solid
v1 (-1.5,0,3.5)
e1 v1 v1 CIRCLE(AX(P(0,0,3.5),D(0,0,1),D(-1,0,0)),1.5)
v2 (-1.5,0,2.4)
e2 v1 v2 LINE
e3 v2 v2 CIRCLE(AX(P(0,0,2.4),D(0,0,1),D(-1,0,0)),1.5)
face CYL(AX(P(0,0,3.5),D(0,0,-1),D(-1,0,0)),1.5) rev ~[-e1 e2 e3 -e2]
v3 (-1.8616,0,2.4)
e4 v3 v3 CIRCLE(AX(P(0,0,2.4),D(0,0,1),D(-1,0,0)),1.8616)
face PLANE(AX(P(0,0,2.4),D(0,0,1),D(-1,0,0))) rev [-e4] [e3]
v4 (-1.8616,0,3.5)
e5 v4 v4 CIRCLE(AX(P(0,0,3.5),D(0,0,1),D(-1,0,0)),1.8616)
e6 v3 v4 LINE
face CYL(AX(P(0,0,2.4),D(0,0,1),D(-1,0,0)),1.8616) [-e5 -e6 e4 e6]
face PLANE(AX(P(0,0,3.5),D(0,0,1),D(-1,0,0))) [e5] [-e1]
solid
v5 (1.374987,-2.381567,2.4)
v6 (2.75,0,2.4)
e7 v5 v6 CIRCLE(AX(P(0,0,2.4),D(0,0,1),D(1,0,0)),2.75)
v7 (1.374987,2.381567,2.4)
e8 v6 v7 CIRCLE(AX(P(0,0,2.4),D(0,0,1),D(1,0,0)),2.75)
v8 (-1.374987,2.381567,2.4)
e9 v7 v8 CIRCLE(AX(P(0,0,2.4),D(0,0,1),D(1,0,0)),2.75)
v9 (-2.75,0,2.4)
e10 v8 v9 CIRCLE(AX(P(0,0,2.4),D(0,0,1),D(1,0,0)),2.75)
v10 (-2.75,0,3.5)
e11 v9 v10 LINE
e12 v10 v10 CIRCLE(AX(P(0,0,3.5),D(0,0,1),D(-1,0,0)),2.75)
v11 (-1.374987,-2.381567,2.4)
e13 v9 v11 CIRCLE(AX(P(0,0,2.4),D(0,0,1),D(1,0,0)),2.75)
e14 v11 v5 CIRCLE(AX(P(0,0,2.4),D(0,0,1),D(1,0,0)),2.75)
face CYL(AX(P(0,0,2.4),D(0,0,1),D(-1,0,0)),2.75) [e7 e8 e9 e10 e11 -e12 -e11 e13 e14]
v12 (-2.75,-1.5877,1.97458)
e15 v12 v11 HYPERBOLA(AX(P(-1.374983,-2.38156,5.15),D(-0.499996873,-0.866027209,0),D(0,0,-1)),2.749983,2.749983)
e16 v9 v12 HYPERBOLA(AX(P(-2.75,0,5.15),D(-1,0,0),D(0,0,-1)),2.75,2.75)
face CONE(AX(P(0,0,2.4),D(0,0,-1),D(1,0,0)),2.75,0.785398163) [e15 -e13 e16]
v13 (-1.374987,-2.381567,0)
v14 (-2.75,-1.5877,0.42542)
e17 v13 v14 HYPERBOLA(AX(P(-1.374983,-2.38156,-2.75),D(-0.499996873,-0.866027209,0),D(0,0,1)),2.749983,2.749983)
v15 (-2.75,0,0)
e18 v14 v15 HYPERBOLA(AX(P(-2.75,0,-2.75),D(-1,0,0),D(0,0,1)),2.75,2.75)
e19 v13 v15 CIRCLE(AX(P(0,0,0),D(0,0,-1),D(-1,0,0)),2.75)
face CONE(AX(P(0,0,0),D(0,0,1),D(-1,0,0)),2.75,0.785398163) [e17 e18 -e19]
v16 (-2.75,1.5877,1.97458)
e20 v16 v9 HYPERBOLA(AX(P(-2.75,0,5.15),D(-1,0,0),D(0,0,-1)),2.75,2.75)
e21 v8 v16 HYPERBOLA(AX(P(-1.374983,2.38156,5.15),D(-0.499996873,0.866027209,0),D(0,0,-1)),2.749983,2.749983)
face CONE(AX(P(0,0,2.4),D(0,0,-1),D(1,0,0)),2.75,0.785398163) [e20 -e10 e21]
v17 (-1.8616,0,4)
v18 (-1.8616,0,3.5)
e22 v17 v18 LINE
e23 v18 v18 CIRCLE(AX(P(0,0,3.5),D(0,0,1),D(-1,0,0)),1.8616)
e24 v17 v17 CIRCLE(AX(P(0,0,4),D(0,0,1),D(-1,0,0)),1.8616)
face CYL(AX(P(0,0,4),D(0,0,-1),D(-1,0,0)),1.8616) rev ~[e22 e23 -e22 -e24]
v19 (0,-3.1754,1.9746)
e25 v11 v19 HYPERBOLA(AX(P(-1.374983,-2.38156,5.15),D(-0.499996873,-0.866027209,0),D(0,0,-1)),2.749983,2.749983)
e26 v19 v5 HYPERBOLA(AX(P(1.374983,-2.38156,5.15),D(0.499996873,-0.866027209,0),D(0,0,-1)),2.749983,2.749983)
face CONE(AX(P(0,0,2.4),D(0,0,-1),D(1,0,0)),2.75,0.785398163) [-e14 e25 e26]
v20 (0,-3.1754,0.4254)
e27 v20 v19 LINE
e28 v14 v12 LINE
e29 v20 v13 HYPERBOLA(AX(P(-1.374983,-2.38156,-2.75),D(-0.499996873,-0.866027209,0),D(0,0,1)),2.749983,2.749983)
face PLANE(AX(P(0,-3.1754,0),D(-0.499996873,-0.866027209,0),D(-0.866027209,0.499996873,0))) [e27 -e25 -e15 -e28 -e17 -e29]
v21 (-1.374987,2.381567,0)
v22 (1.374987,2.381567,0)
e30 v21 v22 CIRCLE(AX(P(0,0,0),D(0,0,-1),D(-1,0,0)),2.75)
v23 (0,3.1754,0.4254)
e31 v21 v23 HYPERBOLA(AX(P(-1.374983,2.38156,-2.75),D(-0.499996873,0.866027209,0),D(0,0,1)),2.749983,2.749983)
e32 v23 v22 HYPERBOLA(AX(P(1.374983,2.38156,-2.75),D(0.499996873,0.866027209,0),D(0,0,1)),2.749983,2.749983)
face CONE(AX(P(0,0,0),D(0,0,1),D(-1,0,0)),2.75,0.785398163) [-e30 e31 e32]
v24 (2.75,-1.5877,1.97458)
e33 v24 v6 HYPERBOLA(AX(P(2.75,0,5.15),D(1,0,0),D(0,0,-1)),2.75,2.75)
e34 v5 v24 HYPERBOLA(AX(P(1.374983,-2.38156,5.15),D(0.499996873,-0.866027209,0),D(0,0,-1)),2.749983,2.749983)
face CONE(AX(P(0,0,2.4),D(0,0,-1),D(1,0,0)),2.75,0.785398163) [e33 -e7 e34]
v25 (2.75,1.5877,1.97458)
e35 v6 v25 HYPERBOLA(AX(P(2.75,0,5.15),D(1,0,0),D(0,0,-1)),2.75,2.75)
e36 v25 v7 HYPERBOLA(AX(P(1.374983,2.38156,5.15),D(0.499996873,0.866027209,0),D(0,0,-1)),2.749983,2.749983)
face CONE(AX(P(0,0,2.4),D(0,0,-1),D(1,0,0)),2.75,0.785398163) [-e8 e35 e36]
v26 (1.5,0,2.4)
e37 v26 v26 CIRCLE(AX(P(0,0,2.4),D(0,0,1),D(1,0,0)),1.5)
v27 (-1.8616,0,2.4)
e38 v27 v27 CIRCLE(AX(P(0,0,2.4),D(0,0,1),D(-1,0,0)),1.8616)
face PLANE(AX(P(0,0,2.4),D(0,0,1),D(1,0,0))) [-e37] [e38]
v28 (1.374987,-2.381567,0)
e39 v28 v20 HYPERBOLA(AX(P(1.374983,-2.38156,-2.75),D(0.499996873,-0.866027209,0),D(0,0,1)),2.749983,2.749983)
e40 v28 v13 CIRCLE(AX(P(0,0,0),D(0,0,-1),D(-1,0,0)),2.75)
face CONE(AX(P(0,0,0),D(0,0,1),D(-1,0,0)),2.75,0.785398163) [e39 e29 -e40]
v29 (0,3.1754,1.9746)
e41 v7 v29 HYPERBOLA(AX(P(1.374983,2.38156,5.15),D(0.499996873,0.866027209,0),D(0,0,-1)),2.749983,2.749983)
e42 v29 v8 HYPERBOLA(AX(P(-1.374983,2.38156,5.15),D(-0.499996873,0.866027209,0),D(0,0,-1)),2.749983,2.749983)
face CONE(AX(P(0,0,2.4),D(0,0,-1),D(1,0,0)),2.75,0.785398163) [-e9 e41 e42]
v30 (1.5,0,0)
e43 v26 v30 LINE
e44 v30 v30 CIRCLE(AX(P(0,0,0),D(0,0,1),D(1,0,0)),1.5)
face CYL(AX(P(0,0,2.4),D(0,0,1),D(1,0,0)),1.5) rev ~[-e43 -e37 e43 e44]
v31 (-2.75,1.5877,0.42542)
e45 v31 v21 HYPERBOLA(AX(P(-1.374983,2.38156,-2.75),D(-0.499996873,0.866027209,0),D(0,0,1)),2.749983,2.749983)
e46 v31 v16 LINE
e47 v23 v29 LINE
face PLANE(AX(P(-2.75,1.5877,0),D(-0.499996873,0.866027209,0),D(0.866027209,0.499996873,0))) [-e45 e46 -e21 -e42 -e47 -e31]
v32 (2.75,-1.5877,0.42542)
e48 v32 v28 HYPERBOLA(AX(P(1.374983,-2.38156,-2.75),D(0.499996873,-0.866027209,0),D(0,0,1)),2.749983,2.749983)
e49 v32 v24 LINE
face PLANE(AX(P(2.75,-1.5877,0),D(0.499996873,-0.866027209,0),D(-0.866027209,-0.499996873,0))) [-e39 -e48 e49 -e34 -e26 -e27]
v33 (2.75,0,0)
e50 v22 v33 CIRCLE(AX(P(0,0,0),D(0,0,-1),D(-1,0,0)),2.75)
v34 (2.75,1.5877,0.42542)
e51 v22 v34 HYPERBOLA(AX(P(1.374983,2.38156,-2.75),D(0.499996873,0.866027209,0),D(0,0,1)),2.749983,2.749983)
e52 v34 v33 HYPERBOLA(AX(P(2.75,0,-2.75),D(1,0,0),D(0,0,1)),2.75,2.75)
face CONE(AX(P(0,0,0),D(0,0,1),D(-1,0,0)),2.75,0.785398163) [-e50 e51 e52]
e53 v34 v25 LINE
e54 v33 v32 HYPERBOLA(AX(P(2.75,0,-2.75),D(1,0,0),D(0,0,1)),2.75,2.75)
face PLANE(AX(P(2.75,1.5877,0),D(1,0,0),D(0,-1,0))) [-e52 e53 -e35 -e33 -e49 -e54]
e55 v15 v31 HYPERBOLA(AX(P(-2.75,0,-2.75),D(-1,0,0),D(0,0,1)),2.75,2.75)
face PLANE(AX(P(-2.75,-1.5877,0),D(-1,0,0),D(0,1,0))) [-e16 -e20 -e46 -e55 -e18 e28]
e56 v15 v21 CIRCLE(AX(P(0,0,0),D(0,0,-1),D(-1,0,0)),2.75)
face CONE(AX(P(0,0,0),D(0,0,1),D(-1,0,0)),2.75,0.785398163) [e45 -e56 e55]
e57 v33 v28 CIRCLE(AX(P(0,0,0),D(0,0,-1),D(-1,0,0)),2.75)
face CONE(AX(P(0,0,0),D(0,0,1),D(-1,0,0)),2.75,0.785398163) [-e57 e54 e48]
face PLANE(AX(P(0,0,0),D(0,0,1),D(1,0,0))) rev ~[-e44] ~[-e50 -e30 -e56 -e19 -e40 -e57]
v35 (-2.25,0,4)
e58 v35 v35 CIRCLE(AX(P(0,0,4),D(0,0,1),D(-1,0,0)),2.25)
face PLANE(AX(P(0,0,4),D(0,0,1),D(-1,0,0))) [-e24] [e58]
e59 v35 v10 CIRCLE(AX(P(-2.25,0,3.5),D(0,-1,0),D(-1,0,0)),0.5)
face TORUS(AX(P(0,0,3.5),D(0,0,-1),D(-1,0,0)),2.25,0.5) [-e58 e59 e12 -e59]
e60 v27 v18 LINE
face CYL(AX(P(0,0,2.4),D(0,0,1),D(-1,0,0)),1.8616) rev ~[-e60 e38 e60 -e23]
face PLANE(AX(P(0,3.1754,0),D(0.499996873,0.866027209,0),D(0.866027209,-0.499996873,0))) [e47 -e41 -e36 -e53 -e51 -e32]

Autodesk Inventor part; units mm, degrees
ref_plane "YZ Plane" through (0, 0, 0) normal (1, 0, 0) x (0, 1, 0)
ref_plane "XZ Plane" through (0, 0, 0) normal (0, 1, 0) x (-1, 0, 0)
ref_plane "XY Plane" through (0, 0, 0) normal (0, 0, 1) x (1, 0, 0)
sketch "Sketch1" plane through (0, 0, 0) normal (0, 0, 1) x (1, 0, 0)
  line L0 (0, 3.1754) -> (2.75, 1.5877)
  line L1 (2.75, 1.5877) -> (2.75, -1.5877)
  line L2 (2.75, -1.5877) -> (0, -3.1754)
  line L3 (0, -3.1754) -> (-2.75, -1.5877)
  line L4 (-2.75, -1.5877) -> (-2.75, 1.5877)
  line L5 (-2.75, 1.5877) -> (0, 3.1754)
  point P0 (0, 0)
  point P1 (0, 0)
  dimension "d0" = 5.5
extrude "Main Body" add sketch "Sketch1" along normal blind 2.4
sketch "Sketch2" plane through (0, 0, 2.4) normal (0, 0, 1) x (1, 0, 0)
  circle A0 centre (0, 0) radius 2.75
  line L0 (2.75, -1.5877) -> (2.75, 1.5877) construction
  point P0 (2.75, 0)
extrude "Front Taper" cut sketch "Sketch2" against normal up to surface (2.4 mm away) draft 45 keep common part
sketch "Sketch3" plane through (0, 0, 0) normal (0, 0, -1) x (-1, 0, 0)
  circle A0 centre (0, 0) radius 2.75
  line L0 (-2.75, -1.5877) -> (-2.75, 1.5877) projected
  point P0 (-2.75, 0)
extrude "Back Taper" cut sketch "Sketch3" against normal up to surface (2.4 mm away) draft 45 keep common part
sketch "Sketch4" plane through (0, 0, 2.4) normal (0, 0, 1) x (1, 0, 0)
  circle A0 centre (0, 0) radius 1.5
  dimension "d9" = 3
extrude "Center Hole" cut sketch "Sketch4" against normal up to surface (2.4 mm away)
sketch "Sketch6" plane through (0, 0, 0) normal (0, 1, 0) x (-1, 0, 0)
  line L0 (-2.75, 0) -> (-2.75, 2.4) projected
  line L1 (-2.75, 2.4) -> (-1.5, 2.4) projected
  line L2 (-1.5, 0) -> (-2.75, 0) projected
  line L3 (2.75, 2.4) -> (2.75, 0) projected
  line L4 (2.75, 0) -> (1.5, 0) projected
  line L5 (1.5, 2.4) -> (2.75, 2.4) projected
  line L6 (1.5, 2.4) -> (1.8616, 2.4)
  line L7 (1.8616, 2.4) -> (1.8616, 3.5)
  line L8 (1.8616, 3.5) -> (1.5, 3.5)
  line L9 (1.5, 3.5) -> (1.5, 2.4)
  line L10 (1.8616, 2.4) -> (2.75, 2.4)
  line L11 (2.75, 2.4) -> (2.75, 4)
  line L12 (2.75, 4) -> (1.8616, 4)
  line L13 (1.8616, 4) -> (1.8616, 2.4)
  line L14 (0, -1.0258) -> (0, 4.8376) projected
  line L15 (-1.5, 2.4) -> (-1.5, 0) projected
  line L16 (1.5, 0) -> (1.5, 2.4) projected
  point P0 (0, 0)
  dimension "d35" = 0.3616
  dimension "d36" = 1.6
  dimension "d37" = 0.5
revolve "Locking Cap" add sketch "Sketch6" angle 360 about axis through (0, 0, -10) along (0, 0, 1) contours L5 L7 L13 L12 L11
fillet "Fillet1" radius 0.5 1 edges at (2.75, 0, 4)
revolve "Nylon Locking" add sketch "Sketch6" angle 360 about axis through (0, 0, -10) along (0, 0, 1) separate body contours L5 L9 L8 L7
thread "Thread1" size "M3x0.5" class "6H" standard "ANSI Metric M Profile" full length
sketch "Sketch5" plane through (0, 0, 0) normal (1, 0, 0) x (0, 1, 0)
  line L0 (-1.8259, 3.2833) -> (-1.5, 3.4714)
  line L1 (-1.5, 3.4714) -> (-1.5, 2.9714)
  line L2 (-1.5, 2.9714) -> (-1.8259, 3.1596)
  line L3 (-1.933, 3.2214) -> (-1.5, 3.2214) construction
  line L4 (-1.5, 2.4) -> (1.5, 2.4) construction
  arc A0 (-1.8259, 3.2833) -> (-1.8259, 3.1596) centre (-1.7902, 3.2214) ccw
  point P0 (0, 0)
  point P1 (-1.6443, 3.2214)
  point P2 (-1.8616, 3.2214)
  dimension "d14" = 0.5
  dimension "d15" = 0.5714
  dimension "d16" = 0
  dimension "d17" = 0.0714
  dimension "d33" = 0.3616
coil "Coil1" [suppressed]
equation "\"d0\" = size"
equation "\"d1\" = sideHeight"
equation "\"d9\" = nominalDiameter"
equation "\"d35\" = d33"
equation "\"d36\" = lockingHeight"
equation "\"d37\" = threadPitch"
equation "\"d40\" = d37"
equation "\"d14\" = threadPitch"
equation "\"d15\" = 1.14286 * threadPitch"
equation "\"d17\" = 0.142857 * threadPitch"
equation "\"d18\" = threadPitch"
equation "\"d19\" = 1.57143 * sideHeight"
equation "\"size\" = 5.5"
equation "\"sideHeight\" = 2.4"
equation "\"nominalDiameter\" = 3"
equation "\"threadPitch\" = 0.5"
equation "\"thickness\" = 4"
equation "\"lockingHeight\" = thickness - sideHeight"
equation "\"d29\" = 0.5 * size - 0.5 * nominalDiameter - threadPitch"
properties part number "M1.6" material "Steel, Galvanized"
